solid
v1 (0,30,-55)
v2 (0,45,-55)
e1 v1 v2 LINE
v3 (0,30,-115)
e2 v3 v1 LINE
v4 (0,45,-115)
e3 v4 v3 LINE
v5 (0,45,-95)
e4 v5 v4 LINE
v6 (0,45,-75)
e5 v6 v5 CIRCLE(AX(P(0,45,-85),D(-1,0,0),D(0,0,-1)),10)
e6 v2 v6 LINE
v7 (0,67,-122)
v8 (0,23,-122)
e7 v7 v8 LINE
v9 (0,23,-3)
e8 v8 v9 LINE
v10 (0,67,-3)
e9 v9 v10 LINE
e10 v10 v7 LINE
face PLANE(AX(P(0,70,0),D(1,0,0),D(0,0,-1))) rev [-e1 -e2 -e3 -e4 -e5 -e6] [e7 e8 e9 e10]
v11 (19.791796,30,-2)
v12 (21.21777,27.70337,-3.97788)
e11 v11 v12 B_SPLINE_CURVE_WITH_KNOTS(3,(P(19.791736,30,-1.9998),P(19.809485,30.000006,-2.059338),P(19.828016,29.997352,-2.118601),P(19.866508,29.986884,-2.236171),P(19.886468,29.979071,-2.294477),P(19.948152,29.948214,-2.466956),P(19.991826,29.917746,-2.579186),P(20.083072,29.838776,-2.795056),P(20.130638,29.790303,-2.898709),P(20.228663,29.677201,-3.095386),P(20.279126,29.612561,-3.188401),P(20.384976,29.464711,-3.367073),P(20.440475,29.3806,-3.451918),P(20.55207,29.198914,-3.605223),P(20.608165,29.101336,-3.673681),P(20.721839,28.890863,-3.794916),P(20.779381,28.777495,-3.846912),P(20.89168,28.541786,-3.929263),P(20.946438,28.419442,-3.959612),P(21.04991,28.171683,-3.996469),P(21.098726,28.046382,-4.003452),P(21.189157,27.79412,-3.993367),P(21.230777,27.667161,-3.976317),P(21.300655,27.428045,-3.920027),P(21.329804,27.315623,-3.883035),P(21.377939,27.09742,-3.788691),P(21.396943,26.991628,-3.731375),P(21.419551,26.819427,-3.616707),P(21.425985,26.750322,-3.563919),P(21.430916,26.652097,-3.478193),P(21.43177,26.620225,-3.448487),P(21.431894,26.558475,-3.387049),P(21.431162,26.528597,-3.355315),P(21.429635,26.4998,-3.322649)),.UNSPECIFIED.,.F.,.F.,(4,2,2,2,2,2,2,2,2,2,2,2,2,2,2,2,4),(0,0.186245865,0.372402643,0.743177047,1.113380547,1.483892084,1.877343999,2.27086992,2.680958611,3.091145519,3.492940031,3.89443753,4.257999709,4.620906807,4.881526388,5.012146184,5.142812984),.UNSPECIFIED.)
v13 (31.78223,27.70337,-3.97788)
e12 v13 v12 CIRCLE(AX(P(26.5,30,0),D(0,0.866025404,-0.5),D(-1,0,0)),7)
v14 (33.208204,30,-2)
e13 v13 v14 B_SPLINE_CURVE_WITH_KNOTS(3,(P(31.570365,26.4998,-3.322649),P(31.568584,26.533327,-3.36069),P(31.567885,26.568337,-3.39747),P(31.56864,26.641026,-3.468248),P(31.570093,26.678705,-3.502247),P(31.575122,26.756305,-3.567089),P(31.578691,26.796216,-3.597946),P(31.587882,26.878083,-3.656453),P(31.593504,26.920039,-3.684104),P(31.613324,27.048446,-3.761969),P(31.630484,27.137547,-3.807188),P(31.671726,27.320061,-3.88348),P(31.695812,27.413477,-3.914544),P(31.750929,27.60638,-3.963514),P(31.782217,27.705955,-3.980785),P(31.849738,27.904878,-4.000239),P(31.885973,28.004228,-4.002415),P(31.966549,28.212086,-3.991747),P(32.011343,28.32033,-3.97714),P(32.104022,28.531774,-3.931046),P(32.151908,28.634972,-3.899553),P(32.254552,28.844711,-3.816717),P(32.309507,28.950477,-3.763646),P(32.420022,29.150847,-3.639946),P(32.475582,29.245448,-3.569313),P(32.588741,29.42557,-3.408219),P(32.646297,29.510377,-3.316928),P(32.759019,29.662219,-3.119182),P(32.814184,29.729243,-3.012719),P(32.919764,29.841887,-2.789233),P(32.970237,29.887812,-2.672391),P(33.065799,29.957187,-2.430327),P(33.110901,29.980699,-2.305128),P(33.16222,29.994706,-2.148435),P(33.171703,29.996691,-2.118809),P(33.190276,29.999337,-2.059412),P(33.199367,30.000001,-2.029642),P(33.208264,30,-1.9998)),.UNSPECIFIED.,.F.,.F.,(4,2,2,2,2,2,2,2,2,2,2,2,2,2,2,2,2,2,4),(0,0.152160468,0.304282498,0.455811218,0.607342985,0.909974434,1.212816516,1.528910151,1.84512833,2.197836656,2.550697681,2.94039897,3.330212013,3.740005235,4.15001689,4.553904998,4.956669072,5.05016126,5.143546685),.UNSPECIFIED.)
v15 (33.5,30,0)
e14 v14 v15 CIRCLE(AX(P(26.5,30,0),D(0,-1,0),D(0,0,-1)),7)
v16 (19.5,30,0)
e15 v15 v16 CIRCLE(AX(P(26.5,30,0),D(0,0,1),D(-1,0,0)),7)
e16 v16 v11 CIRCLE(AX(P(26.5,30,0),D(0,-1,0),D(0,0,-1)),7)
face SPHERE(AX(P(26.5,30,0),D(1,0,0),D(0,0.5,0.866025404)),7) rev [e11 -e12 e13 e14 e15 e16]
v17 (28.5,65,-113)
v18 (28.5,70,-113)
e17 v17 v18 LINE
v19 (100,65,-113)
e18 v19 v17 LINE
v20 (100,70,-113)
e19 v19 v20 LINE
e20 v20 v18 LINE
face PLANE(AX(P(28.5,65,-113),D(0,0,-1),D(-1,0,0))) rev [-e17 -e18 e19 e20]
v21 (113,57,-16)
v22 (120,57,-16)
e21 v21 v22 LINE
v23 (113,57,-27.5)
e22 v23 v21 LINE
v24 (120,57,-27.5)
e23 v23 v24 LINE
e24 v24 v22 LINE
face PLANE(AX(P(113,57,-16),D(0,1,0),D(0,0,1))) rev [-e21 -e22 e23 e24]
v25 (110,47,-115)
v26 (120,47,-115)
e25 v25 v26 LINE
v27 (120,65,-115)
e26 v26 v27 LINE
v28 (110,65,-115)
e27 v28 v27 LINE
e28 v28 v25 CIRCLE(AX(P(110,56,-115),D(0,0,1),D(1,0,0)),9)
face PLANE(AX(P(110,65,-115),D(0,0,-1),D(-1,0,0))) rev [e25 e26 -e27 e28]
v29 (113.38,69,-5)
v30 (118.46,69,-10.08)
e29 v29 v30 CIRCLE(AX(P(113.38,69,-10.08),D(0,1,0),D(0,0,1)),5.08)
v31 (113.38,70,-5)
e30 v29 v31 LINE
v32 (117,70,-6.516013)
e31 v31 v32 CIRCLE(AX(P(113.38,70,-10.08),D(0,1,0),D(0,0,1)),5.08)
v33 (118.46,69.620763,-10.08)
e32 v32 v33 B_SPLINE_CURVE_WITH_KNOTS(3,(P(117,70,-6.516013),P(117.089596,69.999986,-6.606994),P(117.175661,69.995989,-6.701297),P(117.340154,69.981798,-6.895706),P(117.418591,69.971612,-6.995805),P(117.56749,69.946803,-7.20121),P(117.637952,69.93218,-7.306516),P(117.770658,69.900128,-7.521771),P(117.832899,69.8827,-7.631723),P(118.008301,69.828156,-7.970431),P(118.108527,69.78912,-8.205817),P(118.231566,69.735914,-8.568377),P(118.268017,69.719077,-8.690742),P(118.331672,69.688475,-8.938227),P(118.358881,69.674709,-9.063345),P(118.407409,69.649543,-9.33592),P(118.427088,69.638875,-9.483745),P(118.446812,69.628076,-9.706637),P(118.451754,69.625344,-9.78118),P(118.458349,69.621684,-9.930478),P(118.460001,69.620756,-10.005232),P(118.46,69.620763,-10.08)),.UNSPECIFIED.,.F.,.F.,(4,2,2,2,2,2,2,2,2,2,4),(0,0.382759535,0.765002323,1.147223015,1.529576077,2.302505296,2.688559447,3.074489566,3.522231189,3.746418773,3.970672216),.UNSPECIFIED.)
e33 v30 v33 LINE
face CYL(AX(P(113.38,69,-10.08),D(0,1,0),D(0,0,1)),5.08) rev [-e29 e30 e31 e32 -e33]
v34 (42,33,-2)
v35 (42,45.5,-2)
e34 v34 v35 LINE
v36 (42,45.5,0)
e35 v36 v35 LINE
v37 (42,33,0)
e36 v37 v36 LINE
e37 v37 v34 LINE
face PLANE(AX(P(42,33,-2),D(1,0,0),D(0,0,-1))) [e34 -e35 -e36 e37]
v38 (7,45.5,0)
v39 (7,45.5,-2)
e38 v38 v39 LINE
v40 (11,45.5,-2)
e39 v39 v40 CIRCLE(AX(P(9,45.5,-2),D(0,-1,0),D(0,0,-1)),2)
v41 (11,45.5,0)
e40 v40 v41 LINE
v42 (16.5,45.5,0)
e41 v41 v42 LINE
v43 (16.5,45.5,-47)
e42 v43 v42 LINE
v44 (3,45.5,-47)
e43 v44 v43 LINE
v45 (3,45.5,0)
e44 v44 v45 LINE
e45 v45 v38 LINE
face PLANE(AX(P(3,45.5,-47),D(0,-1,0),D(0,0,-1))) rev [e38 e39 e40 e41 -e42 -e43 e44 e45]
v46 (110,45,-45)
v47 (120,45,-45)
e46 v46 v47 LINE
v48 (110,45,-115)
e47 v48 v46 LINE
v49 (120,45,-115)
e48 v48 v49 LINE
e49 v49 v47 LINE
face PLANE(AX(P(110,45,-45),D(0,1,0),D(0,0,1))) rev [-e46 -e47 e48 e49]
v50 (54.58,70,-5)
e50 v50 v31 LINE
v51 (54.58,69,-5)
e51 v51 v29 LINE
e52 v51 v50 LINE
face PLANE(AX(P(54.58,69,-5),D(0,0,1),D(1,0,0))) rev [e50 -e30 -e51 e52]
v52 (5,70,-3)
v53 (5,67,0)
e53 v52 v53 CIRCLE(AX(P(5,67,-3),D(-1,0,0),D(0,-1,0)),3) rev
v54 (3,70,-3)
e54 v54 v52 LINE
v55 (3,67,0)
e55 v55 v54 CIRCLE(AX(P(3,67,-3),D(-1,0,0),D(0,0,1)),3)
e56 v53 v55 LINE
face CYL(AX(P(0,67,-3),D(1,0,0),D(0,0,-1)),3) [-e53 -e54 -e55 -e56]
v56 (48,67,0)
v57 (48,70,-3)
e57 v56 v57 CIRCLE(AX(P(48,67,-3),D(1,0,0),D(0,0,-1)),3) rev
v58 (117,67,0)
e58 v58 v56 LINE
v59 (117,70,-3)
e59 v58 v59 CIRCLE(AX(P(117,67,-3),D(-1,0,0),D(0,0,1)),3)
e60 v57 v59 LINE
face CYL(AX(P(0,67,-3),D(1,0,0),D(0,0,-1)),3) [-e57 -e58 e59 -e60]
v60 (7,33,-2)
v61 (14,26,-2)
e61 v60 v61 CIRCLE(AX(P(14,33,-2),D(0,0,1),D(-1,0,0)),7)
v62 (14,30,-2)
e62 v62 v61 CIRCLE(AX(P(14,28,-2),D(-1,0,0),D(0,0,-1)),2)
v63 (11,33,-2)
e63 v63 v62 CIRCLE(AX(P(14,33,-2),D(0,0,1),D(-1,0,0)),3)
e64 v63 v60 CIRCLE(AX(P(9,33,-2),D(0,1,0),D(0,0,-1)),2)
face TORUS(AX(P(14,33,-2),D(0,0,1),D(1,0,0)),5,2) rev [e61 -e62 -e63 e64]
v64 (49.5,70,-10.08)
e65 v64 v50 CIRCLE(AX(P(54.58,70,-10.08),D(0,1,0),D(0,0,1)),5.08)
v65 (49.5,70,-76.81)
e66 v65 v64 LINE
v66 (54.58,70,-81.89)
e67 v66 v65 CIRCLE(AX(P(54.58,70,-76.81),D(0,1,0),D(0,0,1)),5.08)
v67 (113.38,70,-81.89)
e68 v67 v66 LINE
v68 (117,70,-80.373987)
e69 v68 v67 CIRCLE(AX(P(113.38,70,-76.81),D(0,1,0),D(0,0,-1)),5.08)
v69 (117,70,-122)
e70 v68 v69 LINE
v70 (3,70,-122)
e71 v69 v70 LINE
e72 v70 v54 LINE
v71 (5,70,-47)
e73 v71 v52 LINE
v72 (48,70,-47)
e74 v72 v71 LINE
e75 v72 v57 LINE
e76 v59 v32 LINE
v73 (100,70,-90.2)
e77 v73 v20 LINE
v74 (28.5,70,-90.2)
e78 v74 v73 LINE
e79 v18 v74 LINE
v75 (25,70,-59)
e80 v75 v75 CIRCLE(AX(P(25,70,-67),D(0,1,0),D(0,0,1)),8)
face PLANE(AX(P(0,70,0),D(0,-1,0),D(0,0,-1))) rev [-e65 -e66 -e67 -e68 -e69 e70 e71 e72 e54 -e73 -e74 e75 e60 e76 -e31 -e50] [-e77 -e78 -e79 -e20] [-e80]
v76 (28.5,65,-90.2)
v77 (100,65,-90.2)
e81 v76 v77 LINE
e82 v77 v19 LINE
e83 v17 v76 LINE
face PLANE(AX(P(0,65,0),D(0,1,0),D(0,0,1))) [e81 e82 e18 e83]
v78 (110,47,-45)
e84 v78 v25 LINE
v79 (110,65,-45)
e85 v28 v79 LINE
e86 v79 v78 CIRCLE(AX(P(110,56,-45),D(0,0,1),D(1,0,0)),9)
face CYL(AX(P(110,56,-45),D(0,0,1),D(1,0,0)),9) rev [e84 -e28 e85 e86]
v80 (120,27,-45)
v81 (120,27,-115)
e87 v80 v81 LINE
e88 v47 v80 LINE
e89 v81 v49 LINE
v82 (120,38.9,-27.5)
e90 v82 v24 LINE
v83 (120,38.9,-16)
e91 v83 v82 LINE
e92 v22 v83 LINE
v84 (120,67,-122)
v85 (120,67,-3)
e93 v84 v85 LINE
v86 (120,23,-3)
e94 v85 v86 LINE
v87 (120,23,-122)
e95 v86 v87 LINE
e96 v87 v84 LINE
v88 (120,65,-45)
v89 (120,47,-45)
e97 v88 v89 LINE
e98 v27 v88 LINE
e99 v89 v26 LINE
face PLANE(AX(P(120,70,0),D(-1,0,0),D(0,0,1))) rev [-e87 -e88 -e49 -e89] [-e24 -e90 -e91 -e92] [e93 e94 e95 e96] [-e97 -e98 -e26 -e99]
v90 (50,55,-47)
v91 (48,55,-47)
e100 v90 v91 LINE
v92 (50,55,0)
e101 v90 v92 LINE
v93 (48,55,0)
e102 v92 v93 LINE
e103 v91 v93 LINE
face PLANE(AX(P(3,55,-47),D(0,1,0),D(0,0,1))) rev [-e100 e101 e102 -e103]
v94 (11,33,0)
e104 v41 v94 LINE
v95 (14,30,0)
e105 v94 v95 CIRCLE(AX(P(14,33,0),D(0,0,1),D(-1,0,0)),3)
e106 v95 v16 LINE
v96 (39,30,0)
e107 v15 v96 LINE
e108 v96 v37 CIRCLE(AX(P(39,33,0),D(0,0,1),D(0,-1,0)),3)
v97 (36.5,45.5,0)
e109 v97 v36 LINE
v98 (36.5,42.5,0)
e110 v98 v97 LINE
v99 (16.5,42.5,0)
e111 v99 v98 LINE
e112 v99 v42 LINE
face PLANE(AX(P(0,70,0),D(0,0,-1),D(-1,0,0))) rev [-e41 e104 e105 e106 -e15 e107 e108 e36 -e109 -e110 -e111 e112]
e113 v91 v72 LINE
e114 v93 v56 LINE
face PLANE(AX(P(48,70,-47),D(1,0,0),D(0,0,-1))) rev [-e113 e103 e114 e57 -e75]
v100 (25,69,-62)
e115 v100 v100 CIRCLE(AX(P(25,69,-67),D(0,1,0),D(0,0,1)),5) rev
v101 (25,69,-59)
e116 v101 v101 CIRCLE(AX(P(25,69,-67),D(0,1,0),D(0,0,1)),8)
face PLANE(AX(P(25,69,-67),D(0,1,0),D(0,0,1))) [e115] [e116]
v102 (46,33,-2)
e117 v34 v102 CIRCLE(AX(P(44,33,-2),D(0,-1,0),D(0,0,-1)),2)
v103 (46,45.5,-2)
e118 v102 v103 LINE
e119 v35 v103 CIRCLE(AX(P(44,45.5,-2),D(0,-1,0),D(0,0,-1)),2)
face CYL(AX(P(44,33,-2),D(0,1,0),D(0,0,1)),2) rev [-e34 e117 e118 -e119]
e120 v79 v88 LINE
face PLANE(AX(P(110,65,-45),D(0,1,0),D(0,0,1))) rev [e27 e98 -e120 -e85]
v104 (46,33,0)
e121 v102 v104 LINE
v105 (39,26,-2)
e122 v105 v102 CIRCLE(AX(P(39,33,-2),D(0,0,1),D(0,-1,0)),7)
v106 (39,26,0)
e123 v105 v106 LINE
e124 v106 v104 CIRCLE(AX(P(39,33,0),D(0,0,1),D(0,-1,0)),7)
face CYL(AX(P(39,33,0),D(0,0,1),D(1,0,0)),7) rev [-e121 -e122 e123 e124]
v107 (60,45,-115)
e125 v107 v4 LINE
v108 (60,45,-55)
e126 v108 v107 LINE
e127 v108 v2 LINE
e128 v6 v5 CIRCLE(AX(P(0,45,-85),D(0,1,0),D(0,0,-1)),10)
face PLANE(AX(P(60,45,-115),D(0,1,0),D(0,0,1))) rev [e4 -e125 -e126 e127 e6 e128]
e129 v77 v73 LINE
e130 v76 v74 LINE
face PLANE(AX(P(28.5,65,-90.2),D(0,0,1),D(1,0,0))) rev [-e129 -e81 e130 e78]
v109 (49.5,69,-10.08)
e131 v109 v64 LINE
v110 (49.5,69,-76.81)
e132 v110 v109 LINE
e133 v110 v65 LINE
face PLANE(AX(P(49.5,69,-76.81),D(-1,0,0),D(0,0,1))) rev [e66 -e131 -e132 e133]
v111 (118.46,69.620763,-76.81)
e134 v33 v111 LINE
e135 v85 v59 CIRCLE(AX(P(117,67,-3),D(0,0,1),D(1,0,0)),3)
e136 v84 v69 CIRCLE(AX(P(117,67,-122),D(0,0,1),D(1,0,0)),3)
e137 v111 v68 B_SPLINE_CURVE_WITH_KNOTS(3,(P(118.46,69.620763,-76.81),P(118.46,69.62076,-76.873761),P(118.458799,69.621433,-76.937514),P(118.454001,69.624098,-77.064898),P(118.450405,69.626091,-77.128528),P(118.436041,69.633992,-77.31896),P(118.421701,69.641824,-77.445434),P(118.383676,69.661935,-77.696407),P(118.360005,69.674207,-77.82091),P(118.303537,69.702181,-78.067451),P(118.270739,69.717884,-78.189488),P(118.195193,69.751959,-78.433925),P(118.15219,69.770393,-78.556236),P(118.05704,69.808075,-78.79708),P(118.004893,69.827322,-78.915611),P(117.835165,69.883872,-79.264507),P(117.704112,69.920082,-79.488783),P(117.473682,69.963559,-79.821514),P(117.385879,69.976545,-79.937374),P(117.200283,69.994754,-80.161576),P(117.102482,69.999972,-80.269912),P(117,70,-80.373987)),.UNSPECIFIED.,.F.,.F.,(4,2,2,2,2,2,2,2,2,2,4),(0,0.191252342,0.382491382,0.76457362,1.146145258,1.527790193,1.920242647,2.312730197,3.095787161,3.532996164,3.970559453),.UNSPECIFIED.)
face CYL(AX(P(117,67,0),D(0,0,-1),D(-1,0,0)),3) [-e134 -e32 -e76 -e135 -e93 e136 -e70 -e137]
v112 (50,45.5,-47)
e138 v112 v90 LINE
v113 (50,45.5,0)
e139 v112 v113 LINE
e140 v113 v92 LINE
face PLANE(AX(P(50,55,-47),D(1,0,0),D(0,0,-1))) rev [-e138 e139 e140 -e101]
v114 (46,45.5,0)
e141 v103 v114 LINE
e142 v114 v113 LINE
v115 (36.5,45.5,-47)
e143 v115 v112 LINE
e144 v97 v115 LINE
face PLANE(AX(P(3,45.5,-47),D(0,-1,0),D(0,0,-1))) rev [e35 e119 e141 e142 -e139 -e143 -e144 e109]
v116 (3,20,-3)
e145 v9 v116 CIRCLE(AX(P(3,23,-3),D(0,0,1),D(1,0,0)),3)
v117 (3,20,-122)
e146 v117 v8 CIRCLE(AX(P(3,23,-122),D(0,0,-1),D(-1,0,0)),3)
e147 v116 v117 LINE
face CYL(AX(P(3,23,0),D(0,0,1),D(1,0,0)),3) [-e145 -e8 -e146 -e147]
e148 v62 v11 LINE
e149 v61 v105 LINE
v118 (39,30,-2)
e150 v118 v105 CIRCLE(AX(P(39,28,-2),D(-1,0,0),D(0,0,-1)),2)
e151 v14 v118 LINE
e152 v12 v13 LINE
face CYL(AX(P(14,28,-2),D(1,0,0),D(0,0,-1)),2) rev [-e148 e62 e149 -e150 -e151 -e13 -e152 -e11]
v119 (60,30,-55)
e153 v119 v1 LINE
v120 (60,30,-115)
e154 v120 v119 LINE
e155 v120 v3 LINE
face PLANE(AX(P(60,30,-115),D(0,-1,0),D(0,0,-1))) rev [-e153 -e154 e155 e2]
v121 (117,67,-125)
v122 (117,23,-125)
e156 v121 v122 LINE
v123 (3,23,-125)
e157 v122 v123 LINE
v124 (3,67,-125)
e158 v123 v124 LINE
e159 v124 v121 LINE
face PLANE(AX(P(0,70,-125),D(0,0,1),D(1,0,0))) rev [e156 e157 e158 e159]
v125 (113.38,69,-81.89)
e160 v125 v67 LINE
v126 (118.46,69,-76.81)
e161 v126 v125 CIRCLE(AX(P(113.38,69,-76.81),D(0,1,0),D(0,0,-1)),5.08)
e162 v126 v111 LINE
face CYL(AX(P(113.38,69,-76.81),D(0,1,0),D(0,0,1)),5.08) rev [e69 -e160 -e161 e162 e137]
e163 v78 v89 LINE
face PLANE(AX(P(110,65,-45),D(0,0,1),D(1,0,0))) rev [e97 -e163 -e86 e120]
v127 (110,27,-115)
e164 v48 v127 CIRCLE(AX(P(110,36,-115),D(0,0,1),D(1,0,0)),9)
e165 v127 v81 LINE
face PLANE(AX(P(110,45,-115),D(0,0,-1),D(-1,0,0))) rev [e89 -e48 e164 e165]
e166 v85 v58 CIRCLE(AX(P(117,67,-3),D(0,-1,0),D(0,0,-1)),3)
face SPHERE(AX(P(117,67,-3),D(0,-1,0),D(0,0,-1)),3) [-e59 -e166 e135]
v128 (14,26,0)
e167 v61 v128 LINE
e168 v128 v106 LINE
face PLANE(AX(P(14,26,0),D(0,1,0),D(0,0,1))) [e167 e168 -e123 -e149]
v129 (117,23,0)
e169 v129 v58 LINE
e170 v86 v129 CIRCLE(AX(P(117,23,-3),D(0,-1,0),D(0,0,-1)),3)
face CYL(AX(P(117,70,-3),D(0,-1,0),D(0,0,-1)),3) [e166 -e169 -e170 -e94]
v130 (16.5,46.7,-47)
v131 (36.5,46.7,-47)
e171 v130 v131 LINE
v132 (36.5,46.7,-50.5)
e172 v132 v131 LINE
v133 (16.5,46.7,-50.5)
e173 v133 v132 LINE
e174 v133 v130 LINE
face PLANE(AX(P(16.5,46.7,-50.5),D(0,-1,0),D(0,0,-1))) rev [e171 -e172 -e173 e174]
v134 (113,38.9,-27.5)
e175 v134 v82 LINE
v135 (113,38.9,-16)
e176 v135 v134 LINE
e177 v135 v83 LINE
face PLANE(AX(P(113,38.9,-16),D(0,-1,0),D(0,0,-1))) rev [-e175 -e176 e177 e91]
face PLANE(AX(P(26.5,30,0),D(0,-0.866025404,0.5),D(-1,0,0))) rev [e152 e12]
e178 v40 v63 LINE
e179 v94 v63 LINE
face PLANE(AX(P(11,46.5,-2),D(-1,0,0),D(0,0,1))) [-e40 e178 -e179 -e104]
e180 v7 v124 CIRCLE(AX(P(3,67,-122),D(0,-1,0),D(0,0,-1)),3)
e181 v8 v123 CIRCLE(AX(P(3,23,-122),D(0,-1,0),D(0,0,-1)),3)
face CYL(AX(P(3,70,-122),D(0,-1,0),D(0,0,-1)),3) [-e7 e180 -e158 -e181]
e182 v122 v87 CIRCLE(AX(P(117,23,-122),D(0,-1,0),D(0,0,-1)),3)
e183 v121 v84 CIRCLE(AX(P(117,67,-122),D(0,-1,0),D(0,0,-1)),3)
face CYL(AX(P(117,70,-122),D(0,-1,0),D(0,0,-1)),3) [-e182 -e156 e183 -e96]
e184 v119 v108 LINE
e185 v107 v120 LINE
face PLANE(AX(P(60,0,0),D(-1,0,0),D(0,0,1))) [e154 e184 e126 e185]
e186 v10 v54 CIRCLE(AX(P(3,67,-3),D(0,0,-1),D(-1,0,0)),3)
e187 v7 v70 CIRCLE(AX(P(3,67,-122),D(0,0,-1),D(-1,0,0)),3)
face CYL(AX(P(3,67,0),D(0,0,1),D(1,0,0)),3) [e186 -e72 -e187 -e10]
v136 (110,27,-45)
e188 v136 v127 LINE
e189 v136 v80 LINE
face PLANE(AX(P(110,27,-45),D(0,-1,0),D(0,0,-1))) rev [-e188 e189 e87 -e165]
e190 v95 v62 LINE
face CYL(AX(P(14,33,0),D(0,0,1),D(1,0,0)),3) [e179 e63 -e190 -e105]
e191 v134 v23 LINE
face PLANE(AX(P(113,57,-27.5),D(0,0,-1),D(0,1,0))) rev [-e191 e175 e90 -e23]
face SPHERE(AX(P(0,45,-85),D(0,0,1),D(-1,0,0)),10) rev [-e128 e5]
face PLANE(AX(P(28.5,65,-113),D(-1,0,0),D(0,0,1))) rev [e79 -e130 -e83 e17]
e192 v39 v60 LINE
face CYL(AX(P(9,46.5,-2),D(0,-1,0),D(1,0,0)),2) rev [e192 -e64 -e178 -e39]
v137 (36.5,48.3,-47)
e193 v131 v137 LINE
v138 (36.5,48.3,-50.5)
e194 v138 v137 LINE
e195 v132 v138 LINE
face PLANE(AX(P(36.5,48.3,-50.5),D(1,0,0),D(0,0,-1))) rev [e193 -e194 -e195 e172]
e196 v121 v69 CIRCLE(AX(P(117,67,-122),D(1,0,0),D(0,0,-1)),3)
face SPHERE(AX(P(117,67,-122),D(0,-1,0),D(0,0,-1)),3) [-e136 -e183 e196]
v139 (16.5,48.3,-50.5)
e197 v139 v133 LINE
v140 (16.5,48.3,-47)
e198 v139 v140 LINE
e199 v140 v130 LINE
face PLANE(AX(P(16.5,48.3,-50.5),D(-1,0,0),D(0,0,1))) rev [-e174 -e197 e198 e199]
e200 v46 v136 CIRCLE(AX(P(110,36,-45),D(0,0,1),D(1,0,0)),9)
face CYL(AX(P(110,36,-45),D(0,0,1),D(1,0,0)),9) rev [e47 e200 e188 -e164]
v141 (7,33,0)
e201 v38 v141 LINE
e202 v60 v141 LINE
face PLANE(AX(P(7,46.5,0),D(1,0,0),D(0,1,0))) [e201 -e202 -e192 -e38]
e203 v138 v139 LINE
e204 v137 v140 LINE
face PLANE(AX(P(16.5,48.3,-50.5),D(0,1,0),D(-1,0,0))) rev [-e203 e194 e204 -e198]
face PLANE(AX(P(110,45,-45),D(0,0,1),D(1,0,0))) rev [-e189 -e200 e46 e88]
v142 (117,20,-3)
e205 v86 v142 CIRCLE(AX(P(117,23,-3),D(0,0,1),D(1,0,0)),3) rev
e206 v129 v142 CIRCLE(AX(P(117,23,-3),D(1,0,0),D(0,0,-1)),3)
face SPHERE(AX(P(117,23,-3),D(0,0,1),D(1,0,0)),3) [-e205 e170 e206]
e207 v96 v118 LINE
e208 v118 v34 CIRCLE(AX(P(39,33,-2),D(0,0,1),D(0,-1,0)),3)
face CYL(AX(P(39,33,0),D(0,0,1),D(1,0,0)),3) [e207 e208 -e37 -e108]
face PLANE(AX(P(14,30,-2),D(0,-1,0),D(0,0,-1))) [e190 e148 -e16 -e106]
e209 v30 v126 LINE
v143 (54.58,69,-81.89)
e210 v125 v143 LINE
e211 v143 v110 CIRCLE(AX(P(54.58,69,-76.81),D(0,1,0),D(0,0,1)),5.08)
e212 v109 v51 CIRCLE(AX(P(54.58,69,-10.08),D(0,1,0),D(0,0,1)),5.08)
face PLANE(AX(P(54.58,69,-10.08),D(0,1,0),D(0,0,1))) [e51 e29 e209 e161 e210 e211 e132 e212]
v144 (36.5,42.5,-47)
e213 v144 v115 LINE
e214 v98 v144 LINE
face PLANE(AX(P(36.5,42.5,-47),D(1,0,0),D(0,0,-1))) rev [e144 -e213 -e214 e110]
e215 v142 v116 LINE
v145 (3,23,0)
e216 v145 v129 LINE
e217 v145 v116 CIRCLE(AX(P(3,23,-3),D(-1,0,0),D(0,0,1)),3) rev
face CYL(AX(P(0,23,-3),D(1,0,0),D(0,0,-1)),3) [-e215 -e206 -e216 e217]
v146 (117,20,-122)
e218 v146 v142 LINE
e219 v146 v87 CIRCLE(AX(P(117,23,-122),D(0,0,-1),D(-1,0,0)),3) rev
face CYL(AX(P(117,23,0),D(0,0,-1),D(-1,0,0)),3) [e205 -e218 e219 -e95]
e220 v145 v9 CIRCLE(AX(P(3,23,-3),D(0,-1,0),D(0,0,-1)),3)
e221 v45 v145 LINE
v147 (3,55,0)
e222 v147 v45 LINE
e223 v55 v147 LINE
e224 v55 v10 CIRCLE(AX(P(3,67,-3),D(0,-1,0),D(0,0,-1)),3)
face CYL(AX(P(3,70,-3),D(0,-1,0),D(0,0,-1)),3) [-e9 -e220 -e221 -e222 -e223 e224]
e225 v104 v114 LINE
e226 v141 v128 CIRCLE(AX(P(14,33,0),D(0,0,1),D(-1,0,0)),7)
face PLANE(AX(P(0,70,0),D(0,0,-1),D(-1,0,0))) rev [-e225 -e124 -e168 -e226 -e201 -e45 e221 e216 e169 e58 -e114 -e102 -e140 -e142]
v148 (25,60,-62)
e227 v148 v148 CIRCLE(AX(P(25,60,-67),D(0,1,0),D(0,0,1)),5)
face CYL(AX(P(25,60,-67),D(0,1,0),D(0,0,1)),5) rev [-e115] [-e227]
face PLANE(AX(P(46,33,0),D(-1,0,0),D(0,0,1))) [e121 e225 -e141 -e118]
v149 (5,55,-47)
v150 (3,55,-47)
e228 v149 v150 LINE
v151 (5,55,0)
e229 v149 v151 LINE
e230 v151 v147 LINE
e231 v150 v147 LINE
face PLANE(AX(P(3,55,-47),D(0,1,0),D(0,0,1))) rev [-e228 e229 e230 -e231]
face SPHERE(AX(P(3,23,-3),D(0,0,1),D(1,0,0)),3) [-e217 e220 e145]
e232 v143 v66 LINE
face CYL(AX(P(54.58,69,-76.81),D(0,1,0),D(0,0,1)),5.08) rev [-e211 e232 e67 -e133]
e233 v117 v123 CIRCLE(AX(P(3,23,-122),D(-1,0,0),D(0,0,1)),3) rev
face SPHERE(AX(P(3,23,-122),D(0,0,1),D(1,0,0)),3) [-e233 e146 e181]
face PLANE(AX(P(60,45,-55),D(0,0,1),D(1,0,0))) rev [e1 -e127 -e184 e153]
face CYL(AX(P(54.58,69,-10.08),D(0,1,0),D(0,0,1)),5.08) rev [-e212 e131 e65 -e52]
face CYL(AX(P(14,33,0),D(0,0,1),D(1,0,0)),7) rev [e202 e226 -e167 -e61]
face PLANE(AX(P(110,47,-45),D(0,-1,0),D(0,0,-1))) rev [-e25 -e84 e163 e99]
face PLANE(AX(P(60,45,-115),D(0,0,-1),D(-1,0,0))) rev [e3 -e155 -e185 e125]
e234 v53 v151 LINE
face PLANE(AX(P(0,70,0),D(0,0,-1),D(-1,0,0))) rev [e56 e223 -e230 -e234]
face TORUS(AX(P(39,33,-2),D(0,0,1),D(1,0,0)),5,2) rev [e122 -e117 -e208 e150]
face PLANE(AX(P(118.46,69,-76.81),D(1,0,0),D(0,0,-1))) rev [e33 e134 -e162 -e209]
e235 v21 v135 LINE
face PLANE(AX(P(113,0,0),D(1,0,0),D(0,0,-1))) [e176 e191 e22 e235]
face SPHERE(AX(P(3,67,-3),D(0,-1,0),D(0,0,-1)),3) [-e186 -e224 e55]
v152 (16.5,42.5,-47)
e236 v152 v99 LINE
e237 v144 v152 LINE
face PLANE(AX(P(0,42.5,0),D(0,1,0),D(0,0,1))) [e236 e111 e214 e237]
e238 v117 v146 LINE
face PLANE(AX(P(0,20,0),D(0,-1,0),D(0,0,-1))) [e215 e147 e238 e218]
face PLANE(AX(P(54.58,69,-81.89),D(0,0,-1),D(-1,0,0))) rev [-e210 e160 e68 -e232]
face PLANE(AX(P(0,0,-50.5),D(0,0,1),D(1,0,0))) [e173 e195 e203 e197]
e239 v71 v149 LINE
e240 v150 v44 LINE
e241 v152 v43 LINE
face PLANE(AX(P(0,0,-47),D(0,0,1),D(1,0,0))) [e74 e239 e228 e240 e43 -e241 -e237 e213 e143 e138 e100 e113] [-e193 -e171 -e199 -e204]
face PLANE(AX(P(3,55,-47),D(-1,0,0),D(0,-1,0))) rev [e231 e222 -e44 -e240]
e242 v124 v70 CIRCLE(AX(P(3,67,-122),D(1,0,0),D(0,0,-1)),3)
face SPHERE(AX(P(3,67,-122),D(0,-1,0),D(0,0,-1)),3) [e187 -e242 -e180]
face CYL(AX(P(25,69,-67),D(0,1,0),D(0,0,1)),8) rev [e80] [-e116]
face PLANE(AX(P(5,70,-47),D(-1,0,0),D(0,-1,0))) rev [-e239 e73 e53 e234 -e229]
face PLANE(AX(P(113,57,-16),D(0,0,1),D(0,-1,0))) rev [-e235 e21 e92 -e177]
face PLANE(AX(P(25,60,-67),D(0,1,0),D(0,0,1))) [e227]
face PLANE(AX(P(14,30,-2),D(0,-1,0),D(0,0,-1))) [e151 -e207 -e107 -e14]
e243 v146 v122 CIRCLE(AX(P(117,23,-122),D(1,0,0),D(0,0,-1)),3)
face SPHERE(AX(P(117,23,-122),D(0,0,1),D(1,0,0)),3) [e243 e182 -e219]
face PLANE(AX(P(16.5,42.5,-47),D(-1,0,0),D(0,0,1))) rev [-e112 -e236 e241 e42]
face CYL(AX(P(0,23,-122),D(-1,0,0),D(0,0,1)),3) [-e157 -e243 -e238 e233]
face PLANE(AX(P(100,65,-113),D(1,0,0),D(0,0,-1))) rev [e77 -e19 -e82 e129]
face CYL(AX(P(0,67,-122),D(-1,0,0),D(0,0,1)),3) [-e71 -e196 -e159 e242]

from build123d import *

# Parameters (mm, degrees)
SKETCH1_W           = 120
SKETCH1_H           = 125
BOSS_EXTRUDE1_DEPTH = 70
SKETCH3_W           = 47
SKETCH3_H           = 9.5
CUT_EXTRUDE1_DEPTH  = 47
SKETCH4_W           = 43
SKETCH4_H           = 15
CUT_EXTRUDE2_DEPTH  = 47
CUT_REVOLVE1_ANGLE  = 120
SKETCH9_W           = 20
SKETCH9_H           = 47
CUT_EXTRUDE3_DEPTH  = 3
SKETCH10_W          = 20
SKETCH10_H          = 1.6
CUT_EXTRUDE4_DEPTH  = 3.5
CUT_EXTRUDE5_DEPTH  = 1
SKETCH13_W          = 71.5
SKETCH13_H          = 22.8
CUT_EXTRUDE6_DEPTH  = 5
SKETCH14_R          = 5
CUT_EXTRUDE7_DEPTH  = 10
SKETCH15_R          = 8
CUT_EXTRUDE8_DEPTH  = 1
SKETCH16_W          = 70
SKETCH16_H          = 18
CUT_EXTRUDE9_DEPTH  = 10
SKETCH17_W          = 70
SKETCH17_H          = 9
SKETCH18_W          = 70
SKETCH18_H          = 9
SKETCH19_W          = 60
SKETCH19_H          = 15
CUT_EXTRUDE10_DEPTH = 60
CUT_REVOLVE4_ANGLE  = 90
SKETCH21_W          = 120
SKETCH21_H          = 125
CUT_EXTRUDE11_DEPTH = 20
FILLET1_R           = 3
FILLET2_R           = 3
SKETCH22_W          = 11.5
SKETCH22_H          = 18.1
CUT_EXTRUDE12_DEPTH = 7


# Some blends are built 0.0001 mm under size
with BuildPart() as part:
    # Sketch1 → Boss-Extrude1 (new body)
    with BuildSketch(Plane(origin=(0, 0, 0), x_dir=(1, 0, 0), z_dir=(0, 1, 0))):
        with Locations((60, 62.5)):
            Rectangle(SKETCH1_W, SKETCH1_H)
    extrude(amount=BOSS_EXTRUDE1_DEPTH)

    # Sketch3 → Cut-Extrude1 (cut)
    with BuildSketch(Plane.XY):
        with Locations((26.5, 50.25)):
            Rectangle(SKETCH3_W, SKETCH3_H)
    extrude(amount=-CUT_EXTRUDE1_DEPTH, mode=Mode.SUBTRACT)

    # Sketch4 → Cut-Extrude2 (cut)
    with BuildSketch(Plane.XY):
        with Locations((26.5, 62.5)):
            Rectangle(SKETCH4_W, SKETCH4_H)
    extrude(amount=-CUT_EXTRUDE2_DEPTH, mode=Mode.SUBTRACT)

    # Cut-Sweep1: sweep along a path in Sketch5
    with BuildLine(Plane.XY) as cut_sweep1_path:
        Line((9, 45.5), (9, 33))
        ThreePointArc((9, 33), (10.464466094, 29.464466094), (14, 28))
        Line((14, 28), (39, 28))
        ThreePointArc((39, 28), (42.535533906, 29.464466094), (44, 33))
        Line((44, 33), (44, 45.5))
    # Sketch6 → Cut-Sweep1 (sweep, cut)
    with BuildSketch(Plane(origin=(0, 45.5, 0), x_dir=(1, 0, 0), z_dir=(0, 1, 0))):
        with BuildLine():
            Line((7, 0), (7, 2))
            ThreePointArc((7, 2), (9, 4), (11, 2))
            Line((11, 2), (11, 0))
            Line((11, 0), (7, 0))
        make_face()
    sweep(path=cut_sweep1_path.line, mode=Mode.SUBTRACT)

    # Sketch7 → Cut-Revolve1 (revolve, cut)
    with BuildSketch(Plane.XY):
        with BuildLine():
            Line((19.5, 30), (33.5, 30))
            ThreePointArc((33.5, 30), (26.5, 37), (19.5, 30))
        make_face()
    revolve(axis=Axis((19.5, 30, 0), (-1, 0, 0)), revolution_arc=CUT_REVOLVE1_ANGLE, mode=Mode.SUBTRACT)

    # Sketch9 → Cut-Extrude3 (cut)
    with BuildSketch(Plane(origin=(0, 45.5, 0), x_dir=(1, 0, 0), z_dir=(0, 1, 0))):
        with Locations((26.5, 23.5)):
            Rectangle(SKETCH9_W, SKETCH9_H)
    extrude(amount=-CUT_EXTRUDE3_DEPTH, mode=Mode.SUBTRACT)

    # Sketch10 → Cut-Extrude4 (cut)
    with BuildSketch(Plane.XY.offset(-47)):
        with Locations((26.5, 47.5)):
            Rectangle(SKETCH10_W, SKETCH10_H)
    extrude(amount=-CUT_EXTRUDE4_DEPTH, mode=Mode.SUBTRACT)

    # Sketch11 → Cut-Extrude5 (cut)
    with BuildSketch(Plane(origin=(0, 70, 0), x_dir=(1, 0, 0), z_dir=(0, 1, 0))):
        with BuildLine():
            Line((54.58, 81.89), (113.38, 81.89))
            ThreePointArc((113.38, 81.89), (116.972102448, 80.402102448), (118.46, 76.81))
            Line((118.46, 76.81), (118.46, 10.08))
            ThreePointArc((118.46, 10.08), (116.972102448, 6.487897552), (113.38, 5))
            Line((113.38, 5), (54.58, 5))
            ThreePointArc((54.58, 5), (50.987897552, 6.487897552), (49.5, 10.08))
            Line((49.5, 10.08), (49.5, 76.81))
            ThreePointArc((49.5, 76.81), (50.987897552, 80.402102448), (54.58, 81.89))
        make_face()
    extrude(amount=-CUT_EXTRUDE5_DEPTH, mode=Mode.SUBTRACT)

    # Sketch13 → Cut-Extrude6 (cut)
    with BuildSketch(Plane(origin=(0, 70, 0), x_dir=(1, 0, 0), z_dir=(0, 1, 0))):
        with Locations((64.25, 101.6)):
            Rectangle(SKETCH13_W, SKETCH13_H)
    extrude(amount=-CUT_EXTRUDE6_DEPTH, mode=Mode.SUBTRACT)

    # Sketch14 → Cut-Extrude7 (cut)
    with BuildSketch(Plane(origin=(0, 70, 0), x_dir=(1, 0, 0), z_dir=(0, 1, 0))):
        with Locations(Location((25, 67, 0), (0, 0, 270))):
            Circle(SKETCH14_R)
    extrude(amount=-CUT_EXTRUDE7_DEPTH, mode=Mode.SUBTRACT)

    # Sketch15 → Cut-Extrude8 (cut)
    with BuildSketch(Plane(origin=(0, 70, 0), x_dir=(1, 0, 0), z_dir=(0, 1, 0))):
        with Locations(Location((25, 67, 0), (0, 0, 270))):
            Circle(SKETCH15_R)
    extrude(amount=-CUT_EXTRUDE8_DEPTH, mode=Mode.SUBTRACT)

    # Sketch16 → Cut-Extrude9 (cut)
    with BuildSketch(Plane(origin=(120, 0, 0), x_dir=(0, 0, -1), z_dir=(1, 0, 0))):
        with Locations((80, 56)):
            Rectangle(SKETCH16_W, SKETCH16_H)
        with Locations((80, 36)):
            Rectangle(SKETCH16_W, SKETCH16_H)
    extrude(amount=-CUT_EXTRUDE9_DEPTH, mode=Mode.SUBTRACT)

    # Sketch17 → Cut-Revolve2 (revolve, cut)
    with BuildSketch(Plane(origin=(110, 0, 0), x_dir=(0, 0, -1), z_dir=(1, 0, 0))):
        with Locations((80, 60.5)):
            Rectangle(SKETCH17_W, SKETCH17_H)
    revolve(axis=Axis((110, 56, -45), (0, 0, -1)), mode=Mode.SUBTRACT)

    # Sketch18 → Cut-Revolve3 (revolve, cut)
    with BuildSketch(Plane(origin=(110, 0, 0), x_dir=(0, 0, -1), z_dir=(1, 0, 0))):
        with Locations((80, 40.5)):
            Rectangle(SKETCH18_W, SKETCH18_H)
    revolve(axis=Axis((110, 36, -45), (0, 0, -1)), mode=Mode.SUBTRACT)

    # Sketch19 → Cut-Extrude10 (cut)
    with BuildSketch(Plane.ZY):
        with Locations((-85, 37.5)):
            Rectangle(SKETCH19_W, SKETCH19_H)
    extrude(amount=-CUT_EXTRUDE10_DEPTH, mode=Mode.SUBTRACT)

    # Sketch20 → Cut-Revolve4 (revolve, cut)
    with BuildSketch(Plane.ZY):
        with BuildLine():
            Line((-95, 45), (-75, 45))
            ThreePointArc((-75, 45), (-85, 55), (-95, 45))
        make_face()
    revolve(axis=Axis((0, 45, -95), (0, 0, -1)), revolution_arc=CUT_REVOLVE4_ANGLE, mode=Mode.SUBTRACT)

    # Sketch21 → Cut-Extrude11 (cut)
    with BuildSketch(Plane.XZ):
        with Locations((60, -62.5)):
            Rectangle(SKETCH21_W, SKETCH21_H)
    extrude(amount=-CUT_EXTRUDE11_DEPTH, mode=Mode.SUBTRACT)

    # Fillet1
    fillet1_edges = [part.edges().sort_by_distance(p)[0] for p in [
        (60, 20, 0),
        (120, 20, -62.5),
        (60, 20, -125),
        (0, 20, -62.5),
        (0, 45, -125),
        (120, 45, -125),
        (120, 45, 0),
        (0, 45, 0),
    ]]
    fillet(fillet1_edges, radius=FILLET1_R - 0.0001)  # a hair under: the kernel refuses the full size

    # Fillet2
    # the kernel refuses this fillet: 3 mm, written as the material it takes off along each edge
    with BuildSketch(Plane(origin=(40.500249996, 70, 0), x_dir=(0, -0.9999999994444074, 3.3334444463032727e-05), z_dir=(1, 0, 0))) as fillet2_piece_1:
        with BuildLine():
            CenterArc((2.999799998, 2.999999998), FILLET2_R, 180.001909923, 90)
            Line((-0.0002, 2.999899995), (-0.0602, 2.999897995))
            ThreePointArc((-0.0602, 2.999897995), (-0.06005, 1.499947999), (-0.06, -2e-06))
            Line((-0.06, -2e-06), (2e-06, -0.06))
            ThreePointArc((2e-06, -0.06), (1.499951999, -0.05995), (2.999902002, -0.06))
            Line((2.999902002, -0.06), (2.999900002, 0))
        make_face()
    extrude(amount=76.499850004, mode=Mode.SUBTRACT)
    with BuildSketch(Plane(origin=(117.0001, 70, -2.9999), x_dir=(0, 0, 1), z_dir=(-1, 0, 0))) as fillet2_piece_2:
        with BuildLine():
            CenterArc((0, -2.9999), FILLET2_R, 0, 90)
            Line((3, -2.9999), (3.06, -2.9999))
            ThreePointArc((3.06, -2.9999), (3.0599, -1.49995), (3.0599, 0))
            Line((3.0599, 0), (2.9999, 0.06))
            ThreePointArc((2.9999, 0.06), (1.49995, 0.06), (0, 0.0601))
            Line((0, 0.0601), (0, 0.0001))
        make_face()
    revolve(axis=Axis((117.0001, 70, -2.9999), (0, 1, 0)), revolution_arc=90, mode=Mode.SUBTRACT)
    with BuildSketch(Plane(origin=(120, 70, -2.9999), x_dir=(-0.9999999994444074, 3.333444446406897e-05, 0), z_dir=(0, 0, -1)), Plane(origin=(0, 70, -122.0001), x_dir=(0.9999999994444074, 3.333444446406897e-05, 0), z_dir=(0, 0, 1))) as fillet2_piece_3:
        with BuildLine():
            CenterArc((2.999799998, -2.999999998), FILLET2_R, 89.998090077, 90)
            Line((-0.0002, -2.999899995), (-0.0602, -2.999897995))
            ThreePointArc((-0.0602, -2.999897995), (-0.06005, -1.499947999), (-0.06, 2e-06))
            Line((-0.06, 2e-06), (2e-06, 0.06))
            ThreePointArc((2e-06, 0.06), (1.499951999, 0.05995), (2.999902002, 0.06))
            Line((2.999902002, 0.06), (2.999900002, 0))
        make_face()
    extrude(amount=119.0002, mode=Mode.SUBTRACT)
    with BuildSketch(Plane(origin=(117.0001, 70, -122.0001), x_dir=(1, 0, 0), z_dir=(0, 0, 1))) as fillet2_piece_4:
        with BuildLine():
            CenterArc((0, -2.9999), FILLET2_R, 0, 90)
            Line((3, -2.9999), (3.06, -2.9999))
            ThreePointArc((3.06, -2.9999), (3.0599, -1.49995), (3.0599, 0))
            Line((3.0599, 0), (2.9999, 0.06))
            ThreePointArc((2.9999, 0.06), (1.49995, 0.06), (0, 0.0601))
            Line((0, 0.0601), (0, 0.0001))
        make_face()
    revolve(axis=Axis((117.0001, 70, -122.0001), (0, 1, 0)), revolution_arc=90, mode=Mode.SUBTRACT)
    with BuildSketch(Plane(origin=(117.0001, 70, -125), x_dir=(0, 3.333444446406897e-05, 0.9999999994444074), z_dir=(-1, 0, 0))) as fillet2_piece_5:
        with BuildLine():
            CenterArc((2.999799998, -2.999999998), FILLET2_R, 89.998090077, 90)
            Line((-0.0002, -2.999899995), (-0.0602, -2.999897995))
            ThreePointArc((-0.0602, -2.999897995), (-0.06005, -1.499947999), (-0.06, 2e-06))
            Line((-0.06, 2e-06), (2e-06, 0.06))
            ThreePointArc((2e-06, 0.06), (1.499951999, 0.05995), (2.999902002, 0.06))
            Line((2.999902002, 0.06), (2.999900002, 0))
        make_face()
    extrude(amount=114.0002, mode=Mode.SUBTRACT)
    with BuildSketch(Plane(origin=(2.9999, 70, -122.0001), x_dir=(-1, 0, 0), z_dir=(0, 0, 1))) as fillet2_piece_6:
        with BuildLine():
            CenterArc((0, 2.9999), FILLET2_R, 270, 90)
            Line((3, 2.9999), (3.06, 2.9999))
            ThreePointArc((3.06, 2.9999), (3.0599, 1.49995), (3.0599, 0))
            Line((3.0599, 0), (2.9999, -0.06))
            ThreePointArc((2.9999, -0.06), (1.49995, -0.06), (0, -0.0601))
            Line((0, -0.0601), (0, -0.0001))
        make_face()
    revolve(axis=Axis((2.9999, 70, -122.0001), (0, -1, 0)), revolution_arc=90, mode=Mode.SUBTRACT)
    with BuildSketch(Plane(origin=(2.9999, 70, 0), x_dir=(0, -0.9999999994444074, 3.3334444463032727e-05), z_dir=(1, 0, 0))) as fillet2_piece_7:
        with BuildLine():
            CenterArc((2.999799998, 2.999999998), FILLET2_R, 180.001909923, 90)
            Line((-0.0002, 2.999899995), (-0.0602, 2.999897995))
            ThreePointArc((-0.0602, 2.999897995), (-0.06005, 1.499947999), (-0.06, -2e-06))
            Line((-0.06, -2e-06), (2e-06, -0.06))
            ThreePointArc((2e-06, -0.06), (1.499951999, -0.05995), (2.999902002, -0.06))
            Line((2.999902002, -0.06), (2.999900002, 0))
        make_face()
    extrude(amount=9.499850004, mode=Mode.SUBTRACT)
    with BuildSketch(Plane(origin=(2.9999, 70, -2.9999), x_dir=(0, 0, 1), z_dir=(1, 0, 0))) as fillet2_piece_8:
        with BuildLine():
            CenterArc((0, 2.9999), FILLET2_R, 270, 90)
            Line((3, 2.9999), (3.06, 2.9999))
            ThreePointArc((3.06, 2.9999), (3.0599, 1.49995), (3.0599, 0))
            Line((3.0599, 0), (2.9999, -0.06))
            ThreePointArc((2.9999, -0.06), (1.49995, -0.06), (0, -0.0601))
            Line((0, -0.0601), (0, -0.0001))
        make_face()
    revolve(axis=Axis((2.9999, 70, -2.9999), (0, -1, 0)), revolution_arc=90, mode=Mode.SUBTRACT)

    # Sketch22 → Cut-Extrude12 (cut)
    with BuildSketch(Plane(origin=(120, 0, 0), x_dir=(0, 0, -1), z_dir=(1, 0, 0))):
        with Locations((21.75, 47.95)):
            Rectangle(SKETCH22_W, SKETCH22_H)
    extrude(amount=-CUT_EXTRUDE12_DEPTH, mode=Mode.SUBTRACT)


solid = part.part
